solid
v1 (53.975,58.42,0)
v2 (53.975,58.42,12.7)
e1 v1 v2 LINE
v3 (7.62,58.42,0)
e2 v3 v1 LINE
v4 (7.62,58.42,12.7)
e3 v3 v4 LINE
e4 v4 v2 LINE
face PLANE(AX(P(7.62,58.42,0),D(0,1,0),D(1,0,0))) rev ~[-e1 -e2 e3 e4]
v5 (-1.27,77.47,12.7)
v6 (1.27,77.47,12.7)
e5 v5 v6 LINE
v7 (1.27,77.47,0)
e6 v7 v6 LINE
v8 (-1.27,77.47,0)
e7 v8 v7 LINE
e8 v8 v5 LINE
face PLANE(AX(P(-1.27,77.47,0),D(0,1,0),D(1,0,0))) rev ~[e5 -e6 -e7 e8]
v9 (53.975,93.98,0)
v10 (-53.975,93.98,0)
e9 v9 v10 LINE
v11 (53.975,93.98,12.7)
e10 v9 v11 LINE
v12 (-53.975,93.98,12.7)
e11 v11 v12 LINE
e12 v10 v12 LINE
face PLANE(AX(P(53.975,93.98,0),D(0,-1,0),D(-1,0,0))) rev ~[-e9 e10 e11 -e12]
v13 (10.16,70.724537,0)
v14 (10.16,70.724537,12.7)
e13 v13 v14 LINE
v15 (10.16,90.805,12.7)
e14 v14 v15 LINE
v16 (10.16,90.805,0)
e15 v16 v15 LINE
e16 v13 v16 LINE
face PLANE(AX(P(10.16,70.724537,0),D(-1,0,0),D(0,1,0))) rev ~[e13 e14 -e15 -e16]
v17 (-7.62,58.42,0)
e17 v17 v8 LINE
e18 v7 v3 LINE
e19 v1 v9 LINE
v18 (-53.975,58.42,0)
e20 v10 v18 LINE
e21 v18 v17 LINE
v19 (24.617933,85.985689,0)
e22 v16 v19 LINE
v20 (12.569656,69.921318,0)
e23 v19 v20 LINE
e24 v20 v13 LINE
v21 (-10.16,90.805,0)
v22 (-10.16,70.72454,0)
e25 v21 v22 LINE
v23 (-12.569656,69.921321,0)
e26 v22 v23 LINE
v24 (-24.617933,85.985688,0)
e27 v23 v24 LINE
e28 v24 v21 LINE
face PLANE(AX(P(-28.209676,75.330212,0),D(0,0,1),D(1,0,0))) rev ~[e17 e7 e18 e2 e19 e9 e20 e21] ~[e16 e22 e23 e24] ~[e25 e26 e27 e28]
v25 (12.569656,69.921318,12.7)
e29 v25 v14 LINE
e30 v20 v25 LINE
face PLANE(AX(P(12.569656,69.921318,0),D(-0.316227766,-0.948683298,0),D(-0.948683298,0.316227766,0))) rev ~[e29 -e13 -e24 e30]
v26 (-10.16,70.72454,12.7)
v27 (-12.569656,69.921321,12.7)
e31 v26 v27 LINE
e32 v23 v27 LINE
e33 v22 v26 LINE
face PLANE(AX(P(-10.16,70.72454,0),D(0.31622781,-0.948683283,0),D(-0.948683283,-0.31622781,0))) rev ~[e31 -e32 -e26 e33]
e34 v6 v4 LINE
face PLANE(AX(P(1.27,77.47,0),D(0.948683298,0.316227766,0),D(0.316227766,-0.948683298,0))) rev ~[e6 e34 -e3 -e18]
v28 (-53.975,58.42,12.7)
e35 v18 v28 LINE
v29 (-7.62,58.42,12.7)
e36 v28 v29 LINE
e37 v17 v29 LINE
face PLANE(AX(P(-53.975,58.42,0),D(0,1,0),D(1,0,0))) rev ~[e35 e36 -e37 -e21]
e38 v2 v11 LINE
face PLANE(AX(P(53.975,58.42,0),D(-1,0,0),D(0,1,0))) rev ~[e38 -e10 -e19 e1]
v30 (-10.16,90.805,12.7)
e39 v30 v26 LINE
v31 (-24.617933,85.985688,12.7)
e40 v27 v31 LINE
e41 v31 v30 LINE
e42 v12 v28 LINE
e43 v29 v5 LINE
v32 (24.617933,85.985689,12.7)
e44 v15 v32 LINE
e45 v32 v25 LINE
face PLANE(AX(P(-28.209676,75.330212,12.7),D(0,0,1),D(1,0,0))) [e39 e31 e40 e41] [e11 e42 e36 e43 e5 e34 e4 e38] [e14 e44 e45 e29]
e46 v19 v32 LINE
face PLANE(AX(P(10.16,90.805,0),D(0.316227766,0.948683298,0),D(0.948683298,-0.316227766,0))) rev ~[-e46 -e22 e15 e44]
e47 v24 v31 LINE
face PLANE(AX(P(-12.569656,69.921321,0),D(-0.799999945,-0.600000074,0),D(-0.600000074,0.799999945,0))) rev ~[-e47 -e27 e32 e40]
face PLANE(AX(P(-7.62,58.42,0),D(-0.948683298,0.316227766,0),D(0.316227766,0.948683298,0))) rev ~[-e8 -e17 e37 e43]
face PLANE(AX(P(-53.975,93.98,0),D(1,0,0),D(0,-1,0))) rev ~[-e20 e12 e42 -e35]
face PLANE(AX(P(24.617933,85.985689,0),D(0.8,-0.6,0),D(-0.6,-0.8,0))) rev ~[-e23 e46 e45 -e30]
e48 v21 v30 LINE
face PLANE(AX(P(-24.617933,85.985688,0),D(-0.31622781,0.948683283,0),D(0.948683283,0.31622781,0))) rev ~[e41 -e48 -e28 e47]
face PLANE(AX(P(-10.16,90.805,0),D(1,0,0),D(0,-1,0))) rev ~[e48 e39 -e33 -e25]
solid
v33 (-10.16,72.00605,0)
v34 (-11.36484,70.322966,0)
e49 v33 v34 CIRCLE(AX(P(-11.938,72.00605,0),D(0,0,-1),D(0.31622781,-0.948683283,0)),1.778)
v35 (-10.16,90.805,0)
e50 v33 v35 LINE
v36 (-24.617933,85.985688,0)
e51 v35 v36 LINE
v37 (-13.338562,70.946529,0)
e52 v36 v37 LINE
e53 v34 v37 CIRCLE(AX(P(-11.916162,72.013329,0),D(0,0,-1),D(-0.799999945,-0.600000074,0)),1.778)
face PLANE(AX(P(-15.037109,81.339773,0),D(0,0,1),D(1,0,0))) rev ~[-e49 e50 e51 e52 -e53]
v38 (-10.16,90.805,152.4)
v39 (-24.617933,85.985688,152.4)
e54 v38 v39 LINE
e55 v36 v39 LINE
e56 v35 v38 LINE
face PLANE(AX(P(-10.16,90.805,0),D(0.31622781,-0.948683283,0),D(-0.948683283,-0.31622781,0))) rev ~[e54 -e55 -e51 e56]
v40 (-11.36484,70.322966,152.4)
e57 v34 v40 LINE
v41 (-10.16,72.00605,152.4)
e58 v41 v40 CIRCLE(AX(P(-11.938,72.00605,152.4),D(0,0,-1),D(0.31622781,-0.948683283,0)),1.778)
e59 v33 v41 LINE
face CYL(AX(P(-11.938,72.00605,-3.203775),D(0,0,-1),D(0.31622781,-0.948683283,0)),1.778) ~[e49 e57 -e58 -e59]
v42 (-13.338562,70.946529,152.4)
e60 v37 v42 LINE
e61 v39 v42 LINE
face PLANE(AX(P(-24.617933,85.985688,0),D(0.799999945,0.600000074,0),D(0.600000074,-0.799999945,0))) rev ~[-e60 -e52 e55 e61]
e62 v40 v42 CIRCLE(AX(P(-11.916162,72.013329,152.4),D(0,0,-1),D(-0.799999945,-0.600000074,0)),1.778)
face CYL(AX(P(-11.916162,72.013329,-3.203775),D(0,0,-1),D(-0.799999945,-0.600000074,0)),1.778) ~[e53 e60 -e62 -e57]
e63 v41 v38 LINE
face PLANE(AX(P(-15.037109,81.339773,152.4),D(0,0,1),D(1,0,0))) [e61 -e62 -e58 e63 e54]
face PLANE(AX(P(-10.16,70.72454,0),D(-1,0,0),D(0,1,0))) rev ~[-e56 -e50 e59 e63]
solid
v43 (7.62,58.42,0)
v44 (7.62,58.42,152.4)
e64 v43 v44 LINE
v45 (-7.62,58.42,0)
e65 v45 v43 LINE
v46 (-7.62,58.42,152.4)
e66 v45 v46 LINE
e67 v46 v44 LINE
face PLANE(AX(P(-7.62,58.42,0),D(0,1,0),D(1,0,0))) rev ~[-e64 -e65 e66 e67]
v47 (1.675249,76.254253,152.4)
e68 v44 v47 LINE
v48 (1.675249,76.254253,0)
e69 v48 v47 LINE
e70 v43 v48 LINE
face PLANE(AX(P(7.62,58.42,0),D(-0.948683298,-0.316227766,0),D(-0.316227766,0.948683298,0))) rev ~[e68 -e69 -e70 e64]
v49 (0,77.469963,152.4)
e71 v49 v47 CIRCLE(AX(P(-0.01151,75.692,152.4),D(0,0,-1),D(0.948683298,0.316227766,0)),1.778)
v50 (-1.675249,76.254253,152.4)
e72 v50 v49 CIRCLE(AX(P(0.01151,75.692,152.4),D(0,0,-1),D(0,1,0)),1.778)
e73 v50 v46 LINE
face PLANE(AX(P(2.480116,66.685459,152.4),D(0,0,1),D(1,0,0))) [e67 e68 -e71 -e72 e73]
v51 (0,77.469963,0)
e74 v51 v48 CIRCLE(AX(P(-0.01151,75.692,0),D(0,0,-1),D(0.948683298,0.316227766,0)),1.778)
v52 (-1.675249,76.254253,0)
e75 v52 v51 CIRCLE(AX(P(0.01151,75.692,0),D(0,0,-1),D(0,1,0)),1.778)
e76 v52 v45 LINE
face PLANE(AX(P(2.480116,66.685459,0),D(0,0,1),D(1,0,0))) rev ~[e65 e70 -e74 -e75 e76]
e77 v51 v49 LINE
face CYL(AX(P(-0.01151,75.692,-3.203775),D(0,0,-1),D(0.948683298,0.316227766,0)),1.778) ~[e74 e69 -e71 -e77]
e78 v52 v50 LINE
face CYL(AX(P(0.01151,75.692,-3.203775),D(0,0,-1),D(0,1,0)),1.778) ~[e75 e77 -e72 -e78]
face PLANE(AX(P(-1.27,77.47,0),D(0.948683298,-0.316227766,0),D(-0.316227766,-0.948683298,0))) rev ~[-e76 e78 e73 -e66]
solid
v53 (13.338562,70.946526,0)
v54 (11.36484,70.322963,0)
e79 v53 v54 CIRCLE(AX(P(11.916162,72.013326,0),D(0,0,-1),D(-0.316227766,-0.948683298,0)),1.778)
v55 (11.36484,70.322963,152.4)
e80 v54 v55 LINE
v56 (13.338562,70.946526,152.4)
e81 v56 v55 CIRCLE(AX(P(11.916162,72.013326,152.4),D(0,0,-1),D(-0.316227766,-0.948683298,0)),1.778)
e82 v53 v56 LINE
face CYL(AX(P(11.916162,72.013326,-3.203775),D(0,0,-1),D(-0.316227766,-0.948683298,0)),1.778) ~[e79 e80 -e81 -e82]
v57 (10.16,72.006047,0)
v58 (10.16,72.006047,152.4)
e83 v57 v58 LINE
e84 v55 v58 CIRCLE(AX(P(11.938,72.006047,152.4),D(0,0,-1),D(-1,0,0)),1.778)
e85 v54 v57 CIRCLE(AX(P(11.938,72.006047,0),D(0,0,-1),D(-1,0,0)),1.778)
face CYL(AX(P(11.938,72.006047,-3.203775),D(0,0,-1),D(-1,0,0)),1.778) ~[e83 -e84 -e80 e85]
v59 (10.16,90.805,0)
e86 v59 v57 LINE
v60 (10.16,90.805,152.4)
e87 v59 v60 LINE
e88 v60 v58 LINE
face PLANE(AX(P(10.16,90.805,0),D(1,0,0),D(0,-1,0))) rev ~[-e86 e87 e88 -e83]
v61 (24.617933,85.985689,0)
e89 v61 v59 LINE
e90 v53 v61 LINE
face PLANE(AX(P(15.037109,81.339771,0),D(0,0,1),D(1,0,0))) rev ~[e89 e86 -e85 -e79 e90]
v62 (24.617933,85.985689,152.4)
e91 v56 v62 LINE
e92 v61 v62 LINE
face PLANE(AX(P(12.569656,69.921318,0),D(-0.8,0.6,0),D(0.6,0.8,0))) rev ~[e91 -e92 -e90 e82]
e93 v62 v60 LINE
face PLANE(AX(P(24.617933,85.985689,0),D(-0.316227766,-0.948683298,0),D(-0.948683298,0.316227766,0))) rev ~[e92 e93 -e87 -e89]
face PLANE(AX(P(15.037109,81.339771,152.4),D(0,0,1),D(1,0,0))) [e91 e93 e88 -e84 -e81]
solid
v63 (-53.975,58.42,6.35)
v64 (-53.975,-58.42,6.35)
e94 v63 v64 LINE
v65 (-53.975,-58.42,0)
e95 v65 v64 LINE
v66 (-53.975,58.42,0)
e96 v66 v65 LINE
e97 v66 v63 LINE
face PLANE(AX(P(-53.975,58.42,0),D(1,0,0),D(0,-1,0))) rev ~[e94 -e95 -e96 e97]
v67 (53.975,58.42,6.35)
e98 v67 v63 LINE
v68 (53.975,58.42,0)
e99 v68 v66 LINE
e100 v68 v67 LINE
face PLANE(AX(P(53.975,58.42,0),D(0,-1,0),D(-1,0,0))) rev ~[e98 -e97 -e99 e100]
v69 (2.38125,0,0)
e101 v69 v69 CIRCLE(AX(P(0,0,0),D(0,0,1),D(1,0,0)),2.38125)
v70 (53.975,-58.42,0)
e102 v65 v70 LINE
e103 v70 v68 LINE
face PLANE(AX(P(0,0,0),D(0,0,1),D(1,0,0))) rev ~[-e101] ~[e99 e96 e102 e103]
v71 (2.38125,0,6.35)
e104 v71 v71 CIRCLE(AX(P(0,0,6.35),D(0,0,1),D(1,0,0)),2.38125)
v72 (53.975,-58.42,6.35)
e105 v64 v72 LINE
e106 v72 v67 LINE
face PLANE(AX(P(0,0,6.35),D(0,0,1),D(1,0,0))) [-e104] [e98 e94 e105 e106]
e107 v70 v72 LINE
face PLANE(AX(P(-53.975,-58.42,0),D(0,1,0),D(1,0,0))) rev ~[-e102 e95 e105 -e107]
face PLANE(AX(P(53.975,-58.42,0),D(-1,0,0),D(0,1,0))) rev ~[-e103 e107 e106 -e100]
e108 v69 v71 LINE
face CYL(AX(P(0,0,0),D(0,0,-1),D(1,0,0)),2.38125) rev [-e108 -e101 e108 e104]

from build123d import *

# Parameters (mm, degrees)
F1_DEPTH      = 152.4
F0_R          = 2.38125
F2_DEPTH      = 6.35
F3_DEPTH      = 12.7
F4_T1_DEPTH   = 158.8075491552
F4_2_T1_DEPTH = 158.8075494663
F4_3_T1_DEPTH = 158.8075494663


# Not quite as in the source:
# - a fillet or chamfer that OpenCascade refuses, or shapes differently, is made with other operations: its cross-section is extruded or revolved along the edge and cut away or added


with BuildPart() as f1:
    # F0 (on Top) → F1 (new body)
    with BuildSketch(Plane.XY):
        Polygon((-10.16, 70.724540249), (-10.16, 90.805), (-24.6179332403, 85.98568818), (-12.56965591, 69.921321489), align=None)
    extrude(amount=F1_DEPTH)

    # F4: fillet of radius 1.778 on 2 edges, made by hand

    # F4_s2 → F4_t1 (cut)
    with BuildSketch(Plane.XY.offset(-3.2037745776)):
        with BuildLine():
            ThreePointArc((-11.3757469543, 70.319291202), (-10.4956113708, 70.9664352271), (-10.16, 72.0060500801))
            Line((-10.16, 72.0060500801), (-10.16, 70.724540249))
            Line((-10.16, 70.724540249), (-11.3757469543, 70.319291202))
        make_face()
        with BuildLine():
            ThreePointArc((-13.3385619031, 70.946529283), (-12.4463038366, 70.3162043054), (-11.3539089557, 70.326570536))
            Line((-11.3539089557, 70.326570536), (-12.56965591, 69.921321489))
            Line((-12.56965591, 69.921321489), (-13.3385619031, 70.946529283))
        make_face()
    extrude(amount=F4_T1_DEPTH, mode=Mode.SUBTRACT)


with BuildPart() as f1b:
    # F0 (on Top) → F1, piece 2 (new body)
    with BuildSketch(Plane.XY):
        Polygon((24.6179334623, 85.9856888459), (10.16, 90.805), (10.16, 70.7245368579), (12.569655577, 69.9213183322), align=None)
    extrude(amount=F1_DEPTH)

    # F4#2: fillet of radius 1.778 on 2 edges, made by hand

    # F4_2_s2 → F4_2_t1 (cut)
    with BuildSketch(Plane.XY.offset(-3.2037747331)):
        with BuildLine():
            ThreePointArc((10.16, 72.0060467512), (10.4956113948, 70.9664318651), (11.375747032, 70.3192878473))
            Line((11.375747032, 70.3192878473), (10.16, 70.7245368579))
            Line((10.16, 70.7245368579), (10.16, 72.0060467512))
        make_face()
        with BuildLine():
            ThreePointArc((11.353908545, 70.3265673429), (12.4463034655, 70.3162011748), (13.338561513, 70.9465262469))
            Line((13.338561513, 70.9465262469), (12.569655577, 69.9213183322))
            Line((12.569655577, 69.9213183322), (11.353908545, 70.3265673429))
        make_face()
    extrude(amount=F4_2_T1_DEPTH, mode=Mode.SUBTRACT)


with BuildPart() as f1c:
    # F0 (on Top) → F1, piece 3 (new body)
    with BuildSketch(Plane.XY):
        Polygon((0, 77.47), (0, 58.42), (7.62, 58.42), (1.27, 77.47), align=None)
        Polygon((-1.27, 77.47), (-7.62, 58.42), (0, 58.42), (0, 77.47), align=None)
    extrude(amount=F1_DEPTH)

    # F4#3: fillet of radius 1.778 on 2 edges, made by hand

    # F4_3_s2 → F4_3_t1 (cut)
    with BuildSketch(Plane.XY.offset(-3.2037747331)):
        with BuildLine():
            ThreePointArc((0.0115098933, 77.47), (-1.0281049929, 77.1343886052), (-1.6752490107, 76.254252968))
            Line((-1.6752490107, 76.254252968), (-1.27, 77.47))
            Line((-1.27, 77.47), (0.0115098933, 77.47))
        make_face()
        with BuildLine():
            ThreePointArc((1.6752490107, 76.254252968), (1.0281049929, 77.1343886052), (-0.0115098933, 77.47))
            Line((-0.0115098933, 77.47), (1.27, 77.47))
            Line((1.27, 77.47), (1.6752490107, 76.254252968))
        make_face()
    extrude(amount=F4_3_T1_DEPTH, mode=Mode.SUBTRACT)


with BuildPart() as f2:
    # F0 (on Top) → F2 (new body)
    with BuildSketch(Plane.XY):
        Polygon((-7.62, 58.42), (-53.975, 58.42), (-53.975, -58.42), (53.975, -58.42), (53.975, 58.42), (7.62, 58.42), (0, 58.42), align=None)
        Circle(F0_R, mode=Mode.SUBTRACT)
    extrude(amount=F2_DEPTH)


with BuildPart() as f3:
    # F0 (on Top) → F3 (new body)
    with BuildSketch(Plane.XY):
        Polygon((-53.975, 90.805), (-53.975, 58.42), (-7.62, 58.42), (-1.27, 77.47), (0, 77.47), (0, 90.805), (-10.16, 90.805), align=None)
        Polygon((-24.6179332403, 85.98568818), (-10.16, 90.805), (-10.16, 70.724540249), (-12.56965591, 69.921321489), align=None, mode=Mode.SUBTRACT)
        Polygon((1.27, 77.47), (7.62, 58.42), (53.975, 58.42), (53.975, 90.805), (10.16, 90.805), (0, 90.805), (0, 77.47), align=None)
        Polygon((10.16, 70.7245368579), (10.16, 90.805), (24.6179334623, 85.9856888459), (12.569655577, 69.9213183322), align=None, mode=Mode.SUBTRACT)
        Polygon((53.975, 93.98), (0, 93.98), (0, 90.805), (10.16, 90.805), (53.975, 90.805), align=None)
        Polygon((-53.975, 93.98), (-53.975, 90.805), (-10.16, 90.805), (0, 90.805), (0, 93.98), align=None)
    extrude(amount=F3_DEPTH)


solid = Compound([f1.part, f1b.part, f1c.part, f2.part, f3.part])
